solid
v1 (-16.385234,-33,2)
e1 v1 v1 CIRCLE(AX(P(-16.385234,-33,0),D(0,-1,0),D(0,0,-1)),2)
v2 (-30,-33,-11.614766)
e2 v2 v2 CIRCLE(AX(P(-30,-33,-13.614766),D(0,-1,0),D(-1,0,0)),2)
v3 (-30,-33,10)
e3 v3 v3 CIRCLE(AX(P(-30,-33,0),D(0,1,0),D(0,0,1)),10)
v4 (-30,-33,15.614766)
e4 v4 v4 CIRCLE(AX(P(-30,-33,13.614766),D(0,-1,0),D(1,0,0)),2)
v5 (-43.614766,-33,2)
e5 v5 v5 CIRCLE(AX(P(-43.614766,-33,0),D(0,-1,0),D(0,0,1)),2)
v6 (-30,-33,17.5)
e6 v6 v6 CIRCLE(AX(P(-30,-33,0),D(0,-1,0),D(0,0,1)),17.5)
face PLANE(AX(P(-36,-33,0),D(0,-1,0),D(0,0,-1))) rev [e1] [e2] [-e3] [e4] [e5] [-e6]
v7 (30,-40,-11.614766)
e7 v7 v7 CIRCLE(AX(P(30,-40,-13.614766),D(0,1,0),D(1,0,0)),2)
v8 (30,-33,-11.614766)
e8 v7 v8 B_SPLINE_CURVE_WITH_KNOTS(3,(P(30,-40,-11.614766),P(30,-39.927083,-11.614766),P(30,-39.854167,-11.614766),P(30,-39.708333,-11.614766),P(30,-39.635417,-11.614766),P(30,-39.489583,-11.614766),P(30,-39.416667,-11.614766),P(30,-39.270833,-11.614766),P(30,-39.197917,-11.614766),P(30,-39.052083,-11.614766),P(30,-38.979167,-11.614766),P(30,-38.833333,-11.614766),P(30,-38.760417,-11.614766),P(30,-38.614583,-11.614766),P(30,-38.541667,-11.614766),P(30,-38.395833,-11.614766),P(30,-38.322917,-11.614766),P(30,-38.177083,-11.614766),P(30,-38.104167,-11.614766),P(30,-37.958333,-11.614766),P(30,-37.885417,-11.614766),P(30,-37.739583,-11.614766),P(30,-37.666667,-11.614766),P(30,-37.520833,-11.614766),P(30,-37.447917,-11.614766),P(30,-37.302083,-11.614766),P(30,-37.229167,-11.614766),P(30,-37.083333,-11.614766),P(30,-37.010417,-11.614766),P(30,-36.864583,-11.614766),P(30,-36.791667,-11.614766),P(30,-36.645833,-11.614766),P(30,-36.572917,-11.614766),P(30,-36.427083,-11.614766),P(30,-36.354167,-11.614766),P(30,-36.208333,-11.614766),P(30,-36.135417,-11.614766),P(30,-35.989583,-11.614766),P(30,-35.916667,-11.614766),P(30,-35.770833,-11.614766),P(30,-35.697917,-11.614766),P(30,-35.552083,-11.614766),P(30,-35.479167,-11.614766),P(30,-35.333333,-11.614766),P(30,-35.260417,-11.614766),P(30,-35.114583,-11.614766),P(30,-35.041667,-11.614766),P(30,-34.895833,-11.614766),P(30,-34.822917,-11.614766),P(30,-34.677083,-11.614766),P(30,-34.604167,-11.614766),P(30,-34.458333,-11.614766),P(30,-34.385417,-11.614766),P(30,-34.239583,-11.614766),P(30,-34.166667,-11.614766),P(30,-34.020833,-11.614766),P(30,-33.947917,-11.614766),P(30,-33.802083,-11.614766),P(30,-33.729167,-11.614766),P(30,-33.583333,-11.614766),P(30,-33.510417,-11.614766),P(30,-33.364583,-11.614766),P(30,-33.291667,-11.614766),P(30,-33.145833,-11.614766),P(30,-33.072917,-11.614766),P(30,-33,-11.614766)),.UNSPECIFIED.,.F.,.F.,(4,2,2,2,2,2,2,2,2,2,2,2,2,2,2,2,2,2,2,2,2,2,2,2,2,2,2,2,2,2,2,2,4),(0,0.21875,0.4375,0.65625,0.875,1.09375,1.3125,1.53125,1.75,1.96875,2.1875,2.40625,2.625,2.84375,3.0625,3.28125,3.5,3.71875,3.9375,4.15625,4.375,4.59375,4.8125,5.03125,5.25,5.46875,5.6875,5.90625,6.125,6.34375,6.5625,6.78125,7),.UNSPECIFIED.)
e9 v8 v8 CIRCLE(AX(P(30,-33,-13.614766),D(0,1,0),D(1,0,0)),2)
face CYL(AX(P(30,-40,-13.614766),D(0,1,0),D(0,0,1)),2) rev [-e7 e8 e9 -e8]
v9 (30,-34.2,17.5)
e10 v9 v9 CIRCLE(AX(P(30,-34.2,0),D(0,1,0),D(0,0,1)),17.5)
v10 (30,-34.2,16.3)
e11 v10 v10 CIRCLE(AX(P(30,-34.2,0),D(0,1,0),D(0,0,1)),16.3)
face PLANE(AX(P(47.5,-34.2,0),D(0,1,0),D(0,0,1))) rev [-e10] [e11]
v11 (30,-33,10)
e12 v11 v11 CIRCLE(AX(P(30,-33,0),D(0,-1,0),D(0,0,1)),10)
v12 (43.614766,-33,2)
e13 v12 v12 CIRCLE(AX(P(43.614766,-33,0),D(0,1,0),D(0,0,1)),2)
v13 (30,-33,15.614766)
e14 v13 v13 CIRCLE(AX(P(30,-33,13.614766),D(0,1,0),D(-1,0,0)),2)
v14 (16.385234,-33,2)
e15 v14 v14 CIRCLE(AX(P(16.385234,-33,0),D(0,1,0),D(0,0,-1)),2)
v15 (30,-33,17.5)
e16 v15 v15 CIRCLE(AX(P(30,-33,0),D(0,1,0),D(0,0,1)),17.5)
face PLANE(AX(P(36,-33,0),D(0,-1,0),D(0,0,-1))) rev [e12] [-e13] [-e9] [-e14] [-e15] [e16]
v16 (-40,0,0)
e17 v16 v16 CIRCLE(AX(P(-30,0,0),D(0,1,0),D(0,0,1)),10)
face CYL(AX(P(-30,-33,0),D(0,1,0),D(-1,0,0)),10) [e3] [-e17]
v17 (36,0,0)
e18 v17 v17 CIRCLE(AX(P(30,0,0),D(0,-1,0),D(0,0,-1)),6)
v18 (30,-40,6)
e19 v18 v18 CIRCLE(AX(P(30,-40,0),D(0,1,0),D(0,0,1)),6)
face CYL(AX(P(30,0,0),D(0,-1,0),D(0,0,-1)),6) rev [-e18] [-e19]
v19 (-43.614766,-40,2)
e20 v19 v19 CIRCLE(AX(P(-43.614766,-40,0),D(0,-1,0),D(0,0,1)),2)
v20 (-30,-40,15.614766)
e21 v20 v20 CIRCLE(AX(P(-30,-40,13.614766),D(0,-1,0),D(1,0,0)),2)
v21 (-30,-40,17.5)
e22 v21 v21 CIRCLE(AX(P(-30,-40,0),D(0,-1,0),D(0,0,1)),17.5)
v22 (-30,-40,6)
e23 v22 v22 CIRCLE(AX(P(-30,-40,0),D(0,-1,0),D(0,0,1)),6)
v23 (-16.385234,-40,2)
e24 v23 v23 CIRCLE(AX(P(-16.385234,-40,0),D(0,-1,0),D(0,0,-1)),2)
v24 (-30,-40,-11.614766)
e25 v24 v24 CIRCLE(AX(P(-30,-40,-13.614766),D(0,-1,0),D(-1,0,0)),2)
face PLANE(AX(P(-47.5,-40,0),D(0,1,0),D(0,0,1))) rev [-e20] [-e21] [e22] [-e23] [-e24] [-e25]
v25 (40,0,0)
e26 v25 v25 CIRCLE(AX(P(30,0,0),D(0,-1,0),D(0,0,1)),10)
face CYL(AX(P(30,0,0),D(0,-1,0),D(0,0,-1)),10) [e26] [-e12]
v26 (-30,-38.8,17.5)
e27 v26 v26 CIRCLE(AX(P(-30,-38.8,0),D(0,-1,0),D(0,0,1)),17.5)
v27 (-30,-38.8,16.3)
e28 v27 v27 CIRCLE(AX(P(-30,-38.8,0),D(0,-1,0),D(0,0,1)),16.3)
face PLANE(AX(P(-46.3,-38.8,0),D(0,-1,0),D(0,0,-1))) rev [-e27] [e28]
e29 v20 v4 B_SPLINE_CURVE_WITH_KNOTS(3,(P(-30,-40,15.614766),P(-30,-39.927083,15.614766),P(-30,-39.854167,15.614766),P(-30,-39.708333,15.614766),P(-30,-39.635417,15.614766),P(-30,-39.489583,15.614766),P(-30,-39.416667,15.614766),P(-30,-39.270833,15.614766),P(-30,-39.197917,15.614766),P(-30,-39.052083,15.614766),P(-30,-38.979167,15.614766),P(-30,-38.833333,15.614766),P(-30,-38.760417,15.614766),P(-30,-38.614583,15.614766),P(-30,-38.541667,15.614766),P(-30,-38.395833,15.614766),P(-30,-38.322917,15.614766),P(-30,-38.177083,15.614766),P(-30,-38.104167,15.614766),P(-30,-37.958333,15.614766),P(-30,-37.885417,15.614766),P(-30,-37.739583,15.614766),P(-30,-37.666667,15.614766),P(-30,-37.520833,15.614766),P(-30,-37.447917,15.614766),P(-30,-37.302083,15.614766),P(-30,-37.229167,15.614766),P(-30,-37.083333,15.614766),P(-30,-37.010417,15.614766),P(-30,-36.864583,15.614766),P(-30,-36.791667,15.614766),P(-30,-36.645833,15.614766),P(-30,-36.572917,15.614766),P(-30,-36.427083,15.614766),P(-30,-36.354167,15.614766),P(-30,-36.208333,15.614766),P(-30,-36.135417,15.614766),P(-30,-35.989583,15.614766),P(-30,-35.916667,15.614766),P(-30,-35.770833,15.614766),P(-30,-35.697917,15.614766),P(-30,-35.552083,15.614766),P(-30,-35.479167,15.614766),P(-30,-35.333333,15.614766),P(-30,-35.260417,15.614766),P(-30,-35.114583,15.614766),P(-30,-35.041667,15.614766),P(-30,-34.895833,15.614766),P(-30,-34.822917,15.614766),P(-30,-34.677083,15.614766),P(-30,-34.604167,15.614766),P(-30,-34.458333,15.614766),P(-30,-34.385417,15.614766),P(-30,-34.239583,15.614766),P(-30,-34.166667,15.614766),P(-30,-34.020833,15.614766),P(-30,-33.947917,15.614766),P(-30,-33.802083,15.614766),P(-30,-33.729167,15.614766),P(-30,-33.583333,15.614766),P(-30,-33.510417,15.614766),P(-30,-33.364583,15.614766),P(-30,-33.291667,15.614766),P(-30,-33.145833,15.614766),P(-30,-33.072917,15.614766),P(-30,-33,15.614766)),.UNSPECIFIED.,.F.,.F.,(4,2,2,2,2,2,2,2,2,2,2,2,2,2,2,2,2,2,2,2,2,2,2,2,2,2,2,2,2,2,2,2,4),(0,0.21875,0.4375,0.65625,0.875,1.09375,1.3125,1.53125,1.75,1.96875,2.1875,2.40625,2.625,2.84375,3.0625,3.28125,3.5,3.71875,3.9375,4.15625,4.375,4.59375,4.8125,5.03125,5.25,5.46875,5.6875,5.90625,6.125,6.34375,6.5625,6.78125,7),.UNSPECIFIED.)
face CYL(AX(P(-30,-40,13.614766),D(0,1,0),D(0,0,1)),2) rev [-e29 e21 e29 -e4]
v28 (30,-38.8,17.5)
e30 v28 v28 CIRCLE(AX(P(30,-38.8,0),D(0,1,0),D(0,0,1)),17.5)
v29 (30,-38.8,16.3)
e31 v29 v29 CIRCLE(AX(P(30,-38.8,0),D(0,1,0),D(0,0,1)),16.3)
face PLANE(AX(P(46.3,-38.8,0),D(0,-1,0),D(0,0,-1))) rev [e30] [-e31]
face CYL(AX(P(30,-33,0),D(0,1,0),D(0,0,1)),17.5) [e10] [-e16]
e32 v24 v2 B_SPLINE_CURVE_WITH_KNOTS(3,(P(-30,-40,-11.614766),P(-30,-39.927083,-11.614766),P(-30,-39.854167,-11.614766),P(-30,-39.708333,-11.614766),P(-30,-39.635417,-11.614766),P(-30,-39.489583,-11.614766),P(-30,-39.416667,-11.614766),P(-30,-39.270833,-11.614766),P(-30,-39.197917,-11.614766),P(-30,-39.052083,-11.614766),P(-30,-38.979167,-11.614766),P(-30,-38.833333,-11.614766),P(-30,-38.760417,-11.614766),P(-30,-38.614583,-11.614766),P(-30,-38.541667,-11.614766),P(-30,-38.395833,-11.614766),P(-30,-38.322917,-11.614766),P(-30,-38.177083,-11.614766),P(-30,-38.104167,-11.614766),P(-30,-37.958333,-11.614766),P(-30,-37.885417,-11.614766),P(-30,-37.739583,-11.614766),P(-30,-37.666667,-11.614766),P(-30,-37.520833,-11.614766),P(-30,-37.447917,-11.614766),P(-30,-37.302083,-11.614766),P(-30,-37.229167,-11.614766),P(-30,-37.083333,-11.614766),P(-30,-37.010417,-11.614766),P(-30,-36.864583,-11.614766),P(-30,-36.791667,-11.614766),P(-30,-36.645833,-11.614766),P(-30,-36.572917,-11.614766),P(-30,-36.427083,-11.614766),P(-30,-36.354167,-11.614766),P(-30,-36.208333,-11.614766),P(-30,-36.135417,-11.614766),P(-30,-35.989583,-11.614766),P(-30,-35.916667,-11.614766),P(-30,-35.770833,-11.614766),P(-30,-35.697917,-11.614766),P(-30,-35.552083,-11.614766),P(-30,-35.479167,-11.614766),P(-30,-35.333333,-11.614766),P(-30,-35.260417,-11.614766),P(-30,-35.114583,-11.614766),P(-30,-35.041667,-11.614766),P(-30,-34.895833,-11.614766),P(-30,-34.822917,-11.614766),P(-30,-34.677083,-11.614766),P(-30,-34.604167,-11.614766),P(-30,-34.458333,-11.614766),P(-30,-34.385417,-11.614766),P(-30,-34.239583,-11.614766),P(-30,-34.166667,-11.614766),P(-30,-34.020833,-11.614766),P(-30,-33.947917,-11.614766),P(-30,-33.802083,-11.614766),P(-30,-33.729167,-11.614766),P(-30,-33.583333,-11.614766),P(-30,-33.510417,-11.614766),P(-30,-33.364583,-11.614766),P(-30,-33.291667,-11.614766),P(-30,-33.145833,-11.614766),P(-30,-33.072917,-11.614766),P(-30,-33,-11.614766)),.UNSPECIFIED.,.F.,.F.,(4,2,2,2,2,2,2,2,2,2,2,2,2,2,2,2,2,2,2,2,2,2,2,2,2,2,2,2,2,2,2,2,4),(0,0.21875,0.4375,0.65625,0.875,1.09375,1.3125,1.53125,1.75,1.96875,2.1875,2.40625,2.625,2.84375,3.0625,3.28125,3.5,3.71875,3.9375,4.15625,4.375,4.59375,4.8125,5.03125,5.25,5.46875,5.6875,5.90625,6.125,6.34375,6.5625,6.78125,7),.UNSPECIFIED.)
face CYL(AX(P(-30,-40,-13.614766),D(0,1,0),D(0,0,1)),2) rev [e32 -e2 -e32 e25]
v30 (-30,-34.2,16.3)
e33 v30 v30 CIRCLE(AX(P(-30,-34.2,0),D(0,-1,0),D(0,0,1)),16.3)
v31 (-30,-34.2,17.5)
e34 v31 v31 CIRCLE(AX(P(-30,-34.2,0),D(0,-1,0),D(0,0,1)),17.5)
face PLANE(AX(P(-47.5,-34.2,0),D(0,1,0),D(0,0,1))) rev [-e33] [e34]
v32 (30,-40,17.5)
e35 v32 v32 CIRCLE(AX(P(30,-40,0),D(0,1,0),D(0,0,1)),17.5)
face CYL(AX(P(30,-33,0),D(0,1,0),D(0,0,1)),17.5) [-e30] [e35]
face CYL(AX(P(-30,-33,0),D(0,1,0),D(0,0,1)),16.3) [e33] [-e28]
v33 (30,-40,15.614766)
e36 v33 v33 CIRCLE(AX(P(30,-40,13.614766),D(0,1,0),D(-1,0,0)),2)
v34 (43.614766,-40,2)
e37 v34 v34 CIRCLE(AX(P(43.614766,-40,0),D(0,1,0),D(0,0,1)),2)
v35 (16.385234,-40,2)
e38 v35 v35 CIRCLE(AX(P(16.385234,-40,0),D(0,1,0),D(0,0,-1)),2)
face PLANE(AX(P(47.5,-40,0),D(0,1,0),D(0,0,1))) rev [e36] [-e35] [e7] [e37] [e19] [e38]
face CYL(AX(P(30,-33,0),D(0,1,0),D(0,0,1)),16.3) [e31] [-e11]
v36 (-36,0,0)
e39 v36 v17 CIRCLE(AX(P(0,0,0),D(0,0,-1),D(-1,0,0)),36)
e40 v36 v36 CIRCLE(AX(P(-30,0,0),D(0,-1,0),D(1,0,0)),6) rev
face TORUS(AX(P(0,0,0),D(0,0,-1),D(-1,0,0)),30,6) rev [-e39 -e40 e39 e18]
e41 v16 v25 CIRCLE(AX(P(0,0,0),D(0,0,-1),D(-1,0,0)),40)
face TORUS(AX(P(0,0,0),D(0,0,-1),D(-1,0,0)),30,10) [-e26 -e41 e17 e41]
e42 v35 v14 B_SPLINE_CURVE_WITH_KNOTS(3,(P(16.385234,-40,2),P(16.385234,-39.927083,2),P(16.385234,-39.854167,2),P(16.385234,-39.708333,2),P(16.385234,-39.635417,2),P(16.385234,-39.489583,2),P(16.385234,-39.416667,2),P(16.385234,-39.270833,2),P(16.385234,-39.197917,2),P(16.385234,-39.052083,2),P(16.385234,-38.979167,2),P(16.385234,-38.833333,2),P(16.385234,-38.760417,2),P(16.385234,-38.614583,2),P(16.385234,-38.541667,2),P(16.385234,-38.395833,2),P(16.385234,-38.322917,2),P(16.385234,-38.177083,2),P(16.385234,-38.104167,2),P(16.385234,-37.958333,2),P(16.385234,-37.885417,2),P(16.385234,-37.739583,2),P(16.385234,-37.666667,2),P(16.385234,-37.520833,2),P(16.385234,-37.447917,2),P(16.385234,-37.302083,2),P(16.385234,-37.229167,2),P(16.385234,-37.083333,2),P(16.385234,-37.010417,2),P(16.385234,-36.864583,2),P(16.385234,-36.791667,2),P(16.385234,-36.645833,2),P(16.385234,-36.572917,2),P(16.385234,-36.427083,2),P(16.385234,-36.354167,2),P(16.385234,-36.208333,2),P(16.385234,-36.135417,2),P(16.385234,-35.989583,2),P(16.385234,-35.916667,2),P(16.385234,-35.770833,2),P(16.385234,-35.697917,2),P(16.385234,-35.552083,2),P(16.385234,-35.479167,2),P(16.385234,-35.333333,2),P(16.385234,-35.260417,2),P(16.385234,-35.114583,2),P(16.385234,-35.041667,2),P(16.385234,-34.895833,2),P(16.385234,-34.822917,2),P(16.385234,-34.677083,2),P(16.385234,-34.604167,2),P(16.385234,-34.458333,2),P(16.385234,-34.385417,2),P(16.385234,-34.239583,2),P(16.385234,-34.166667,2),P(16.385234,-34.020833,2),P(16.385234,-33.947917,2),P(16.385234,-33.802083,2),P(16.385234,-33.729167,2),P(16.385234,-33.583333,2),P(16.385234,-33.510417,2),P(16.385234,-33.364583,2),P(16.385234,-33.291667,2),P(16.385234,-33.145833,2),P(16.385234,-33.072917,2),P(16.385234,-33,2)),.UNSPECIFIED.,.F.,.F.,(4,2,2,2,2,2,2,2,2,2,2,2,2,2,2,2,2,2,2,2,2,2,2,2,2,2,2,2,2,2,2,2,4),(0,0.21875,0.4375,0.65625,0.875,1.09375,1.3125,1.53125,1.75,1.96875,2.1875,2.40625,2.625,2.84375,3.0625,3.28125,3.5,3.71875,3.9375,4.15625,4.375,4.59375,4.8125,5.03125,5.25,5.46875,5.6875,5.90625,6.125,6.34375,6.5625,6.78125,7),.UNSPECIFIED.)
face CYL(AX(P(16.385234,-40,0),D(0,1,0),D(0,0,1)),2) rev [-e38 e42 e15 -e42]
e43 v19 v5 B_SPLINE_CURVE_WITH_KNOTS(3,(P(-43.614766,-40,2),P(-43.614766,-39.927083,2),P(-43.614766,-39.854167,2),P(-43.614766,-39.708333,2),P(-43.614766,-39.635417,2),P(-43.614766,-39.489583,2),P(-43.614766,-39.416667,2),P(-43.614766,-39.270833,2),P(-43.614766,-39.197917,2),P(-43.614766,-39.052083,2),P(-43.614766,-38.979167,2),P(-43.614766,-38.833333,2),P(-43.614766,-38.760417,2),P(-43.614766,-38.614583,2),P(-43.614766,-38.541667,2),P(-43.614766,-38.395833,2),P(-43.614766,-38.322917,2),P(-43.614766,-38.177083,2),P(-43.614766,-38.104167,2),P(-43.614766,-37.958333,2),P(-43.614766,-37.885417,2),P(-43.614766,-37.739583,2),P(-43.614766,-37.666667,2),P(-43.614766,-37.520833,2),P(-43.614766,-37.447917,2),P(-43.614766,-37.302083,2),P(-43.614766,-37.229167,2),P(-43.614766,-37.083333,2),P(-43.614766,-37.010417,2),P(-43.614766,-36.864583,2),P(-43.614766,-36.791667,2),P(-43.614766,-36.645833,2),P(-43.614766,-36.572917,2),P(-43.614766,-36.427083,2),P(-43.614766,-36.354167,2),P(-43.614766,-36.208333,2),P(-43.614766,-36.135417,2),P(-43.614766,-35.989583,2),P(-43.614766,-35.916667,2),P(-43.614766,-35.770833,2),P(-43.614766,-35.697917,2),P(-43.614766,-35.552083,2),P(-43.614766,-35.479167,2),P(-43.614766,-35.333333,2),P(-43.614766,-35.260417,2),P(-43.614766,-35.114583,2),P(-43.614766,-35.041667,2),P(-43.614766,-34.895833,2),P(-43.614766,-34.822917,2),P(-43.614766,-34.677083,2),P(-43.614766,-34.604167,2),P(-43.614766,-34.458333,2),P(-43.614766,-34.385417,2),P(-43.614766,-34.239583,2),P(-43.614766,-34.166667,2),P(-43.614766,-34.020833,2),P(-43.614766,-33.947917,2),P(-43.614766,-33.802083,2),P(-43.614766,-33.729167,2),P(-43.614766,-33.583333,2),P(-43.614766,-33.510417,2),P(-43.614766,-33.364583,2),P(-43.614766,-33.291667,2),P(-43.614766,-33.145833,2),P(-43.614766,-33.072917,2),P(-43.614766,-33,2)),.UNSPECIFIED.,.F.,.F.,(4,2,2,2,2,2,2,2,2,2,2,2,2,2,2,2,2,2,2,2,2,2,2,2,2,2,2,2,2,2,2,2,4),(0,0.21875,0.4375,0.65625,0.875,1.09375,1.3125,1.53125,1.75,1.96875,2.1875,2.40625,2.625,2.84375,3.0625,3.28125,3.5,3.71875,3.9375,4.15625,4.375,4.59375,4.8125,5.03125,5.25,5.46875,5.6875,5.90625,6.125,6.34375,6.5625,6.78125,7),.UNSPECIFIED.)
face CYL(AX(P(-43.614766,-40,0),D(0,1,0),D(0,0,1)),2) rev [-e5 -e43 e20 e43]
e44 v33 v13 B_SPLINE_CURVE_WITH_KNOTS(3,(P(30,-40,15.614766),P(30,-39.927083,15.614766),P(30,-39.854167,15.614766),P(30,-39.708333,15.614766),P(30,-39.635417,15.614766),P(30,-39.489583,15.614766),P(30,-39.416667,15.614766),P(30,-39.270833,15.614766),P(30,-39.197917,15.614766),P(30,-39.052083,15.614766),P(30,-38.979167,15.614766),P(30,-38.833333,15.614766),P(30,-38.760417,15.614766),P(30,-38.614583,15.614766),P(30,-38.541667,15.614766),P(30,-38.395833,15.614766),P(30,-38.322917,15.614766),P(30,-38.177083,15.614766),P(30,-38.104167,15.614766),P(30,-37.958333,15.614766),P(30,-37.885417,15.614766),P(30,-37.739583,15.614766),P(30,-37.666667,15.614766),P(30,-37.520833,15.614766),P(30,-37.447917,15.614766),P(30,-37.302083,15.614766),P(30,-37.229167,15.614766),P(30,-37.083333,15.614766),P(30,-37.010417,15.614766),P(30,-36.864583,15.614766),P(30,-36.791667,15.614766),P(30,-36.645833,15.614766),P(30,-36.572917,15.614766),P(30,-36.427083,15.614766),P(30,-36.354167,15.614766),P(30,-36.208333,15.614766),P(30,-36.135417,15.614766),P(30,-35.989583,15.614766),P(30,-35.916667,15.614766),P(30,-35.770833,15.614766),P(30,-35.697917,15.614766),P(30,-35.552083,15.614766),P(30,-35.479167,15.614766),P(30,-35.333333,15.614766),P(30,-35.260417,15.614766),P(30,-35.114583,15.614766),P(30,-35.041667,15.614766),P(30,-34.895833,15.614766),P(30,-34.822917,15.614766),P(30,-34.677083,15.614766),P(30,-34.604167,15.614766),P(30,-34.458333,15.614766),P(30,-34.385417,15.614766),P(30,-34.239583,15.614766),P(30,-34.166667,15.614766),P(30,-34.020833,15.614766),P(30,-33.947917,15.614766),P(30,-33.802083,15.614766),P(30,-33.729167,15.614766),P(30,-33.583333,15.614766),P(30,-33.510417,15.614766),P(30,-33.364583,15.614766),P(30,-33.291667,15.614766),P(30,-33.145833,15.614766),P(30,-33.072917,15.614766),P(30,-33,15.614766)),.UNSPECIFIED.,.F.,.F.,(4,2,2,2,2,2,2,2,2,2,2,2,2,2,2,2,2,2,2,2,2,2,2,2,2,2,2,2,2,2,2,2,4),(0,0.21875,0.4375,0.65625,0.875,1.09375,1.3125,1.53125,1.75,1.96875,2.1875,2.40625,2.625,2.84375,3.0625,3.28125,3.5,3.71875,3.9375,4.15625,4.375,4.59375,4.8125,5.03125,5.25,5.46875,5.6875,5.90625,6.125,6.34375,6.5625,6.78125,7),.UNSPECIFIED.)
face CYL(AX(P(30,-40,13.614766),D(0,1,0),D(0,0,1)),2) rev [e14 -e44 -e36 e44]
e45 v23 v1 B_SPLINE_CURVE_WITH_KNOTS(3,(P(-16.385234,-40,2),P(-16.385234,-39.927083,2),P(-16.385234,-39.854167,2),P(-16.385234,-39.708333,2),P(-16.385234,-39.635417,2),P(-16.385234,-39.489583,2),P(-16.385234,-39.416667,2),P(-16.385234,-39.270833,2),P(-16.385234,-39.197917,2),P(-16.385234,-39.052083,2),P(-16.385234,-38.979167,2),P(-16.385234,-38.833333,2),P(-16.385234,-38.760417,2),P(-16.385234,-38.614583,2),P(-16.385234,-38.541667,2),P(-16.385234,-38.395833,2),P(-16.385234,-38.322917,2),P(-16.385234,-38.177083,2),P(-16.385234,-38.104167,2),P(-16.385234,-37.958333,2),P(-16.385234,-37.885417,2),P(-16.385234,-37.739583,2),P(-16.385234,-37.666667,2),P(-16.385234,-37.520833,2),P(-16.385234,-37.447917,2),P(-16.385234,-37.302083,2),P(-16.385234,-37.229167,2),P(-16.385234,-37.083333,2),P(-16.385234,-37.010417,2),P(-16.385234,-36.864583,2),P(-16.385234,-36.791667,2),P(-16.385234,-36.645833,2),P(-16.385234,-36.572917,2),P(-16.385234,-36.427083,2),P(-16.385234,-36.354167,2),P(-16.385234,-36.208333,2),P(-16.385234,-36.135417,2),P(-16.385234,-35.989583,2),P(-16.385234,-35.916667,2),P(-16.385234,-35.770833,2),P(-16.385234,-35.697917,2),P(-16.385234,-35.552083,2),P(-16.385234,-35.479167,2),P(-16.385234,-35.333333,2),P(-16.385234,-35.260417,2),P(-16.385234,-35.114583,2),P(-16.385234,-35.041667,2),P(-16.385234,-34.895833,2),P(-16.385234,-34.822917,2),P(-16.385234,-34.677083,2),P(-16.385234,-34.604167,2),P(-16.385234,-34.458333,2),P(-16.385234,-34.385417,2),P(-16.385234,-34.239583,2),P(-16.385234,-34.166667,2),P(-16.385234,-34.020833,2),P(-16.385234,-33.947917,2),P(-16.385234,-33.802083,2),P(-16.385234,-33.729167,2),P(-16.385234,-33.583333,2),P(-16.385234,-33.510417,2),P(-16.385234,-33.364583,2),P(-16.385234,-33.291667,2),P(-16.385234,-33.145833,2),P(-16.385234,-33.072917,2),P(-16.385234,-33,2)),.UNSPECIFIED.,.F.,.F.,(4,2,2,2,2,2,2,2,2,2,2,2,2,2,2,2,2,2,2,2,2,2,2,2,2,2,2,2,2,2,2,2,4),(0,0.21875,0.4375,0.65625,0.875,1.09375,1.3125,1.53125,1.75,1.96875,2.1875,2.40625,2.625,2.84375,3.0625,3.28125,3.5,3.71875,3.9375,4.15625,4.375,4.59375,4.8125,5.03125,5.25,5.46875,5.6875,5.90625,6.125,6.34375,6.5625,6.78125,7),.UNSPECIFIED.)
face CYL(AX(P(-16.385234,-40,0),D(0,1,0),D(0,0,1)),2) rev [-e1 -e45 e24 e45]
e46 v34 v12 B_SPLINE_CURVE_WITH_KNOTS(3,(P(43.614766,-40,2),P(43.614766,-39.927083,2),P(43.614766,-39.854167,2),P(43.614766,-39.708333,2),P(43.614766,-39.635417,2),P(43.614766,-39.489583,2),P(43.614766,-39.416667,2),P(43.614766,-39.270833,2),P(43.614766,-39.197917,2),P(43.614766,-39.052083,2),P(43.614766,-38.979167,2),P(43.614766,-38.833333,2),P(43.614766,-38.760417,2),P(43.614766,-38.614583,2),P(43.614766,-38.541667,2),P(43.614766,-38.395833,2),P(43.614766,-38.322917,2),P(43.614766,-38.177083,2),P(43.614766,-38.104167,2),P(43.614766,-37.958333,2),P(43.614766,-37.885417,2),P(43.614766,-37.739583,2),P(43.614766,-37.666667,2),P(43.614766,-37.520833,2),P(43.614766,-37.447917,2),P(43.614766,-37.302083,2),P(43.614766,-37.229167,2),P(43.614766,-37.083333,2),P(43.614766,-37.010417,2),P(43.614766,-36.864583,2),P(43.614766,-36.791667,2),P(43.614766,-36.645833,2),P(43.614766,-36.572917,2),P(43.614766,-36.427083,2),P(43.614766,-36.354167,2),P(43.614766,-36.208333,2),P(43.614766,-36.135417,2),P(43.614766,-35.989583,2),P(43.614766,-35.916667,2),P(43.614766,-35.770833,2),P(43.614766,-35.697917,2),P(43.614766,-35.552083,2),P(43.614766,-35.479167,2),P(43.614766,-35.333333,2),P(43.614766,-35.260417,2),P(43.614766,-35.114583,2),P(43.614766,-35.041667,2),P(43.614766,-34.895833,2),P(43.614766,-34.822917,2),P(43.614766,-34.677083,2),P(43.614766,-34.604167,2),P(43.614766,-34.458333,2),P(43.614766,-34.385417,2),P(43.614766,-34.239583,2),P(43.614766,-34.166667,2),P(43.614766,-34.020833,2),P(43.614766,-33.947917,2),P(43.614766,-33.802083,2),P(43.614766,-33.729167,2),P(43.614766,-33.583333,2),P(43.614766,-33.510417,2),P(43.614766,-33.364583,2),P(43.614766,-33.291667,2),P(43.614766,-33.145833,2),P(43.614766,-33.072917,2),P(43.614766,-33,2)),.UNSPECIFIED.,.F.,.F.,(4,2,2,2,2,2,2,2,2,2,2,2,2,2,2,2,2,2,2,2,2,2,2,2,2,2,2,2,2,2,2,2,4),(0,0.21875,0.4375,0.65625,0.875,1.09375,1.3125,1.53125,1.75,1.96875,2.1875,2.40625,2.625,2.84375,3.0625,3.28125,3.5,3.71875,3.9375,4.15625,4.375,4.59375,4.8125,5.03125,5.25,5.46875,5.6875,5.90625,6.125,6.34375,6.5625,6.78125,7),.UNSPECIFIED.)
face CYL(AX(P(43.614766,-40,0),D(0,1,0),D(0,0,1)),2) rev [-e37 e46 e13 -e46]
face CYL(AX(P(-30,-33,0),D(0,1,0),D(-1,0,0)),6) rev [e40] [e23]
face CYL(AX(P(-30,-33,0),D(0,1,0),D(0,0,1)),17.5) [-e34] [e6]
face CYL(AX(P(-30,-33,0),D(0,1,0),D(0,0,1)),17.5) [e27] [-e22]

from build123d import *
from build123d.topology import SkipClean

# Parameters (mm, degrees)
SKETCH3_R               = 10
SKETCH3_R_2             = 6
SKETCH7_R               = 2
CUT_EXTRUDE1_DEPTH      = 89.834115151
CIRPATTERN1_COUNT       = 4
MIRROR2_COPY_1_SKETCH_R = 2
MIRROR2_COPY_1_DEPTH    = 89.834115151
MIRROR2_COPY_2_SKETCH_R = 2
MIRROR2_COPY_2_DEPTH    = 89.834115151
MIRROR2_COPY_3_SKETCH_R = 2
MIRROR2_COPY_3_DEPTH    = 89.834115151
MIRROR2_COPY_4_SKETCH_R = 2
MIRROR2_COPY_4_DEPTH    = 89.834115151


with BuildPart() as part:
    # Sweep-Thin2: sweep along a path in Sketch1
    with BuildLine(Plane.XY) as sweep_thin2_path:
        Line((-30, -33), (-30, 0))
        ThreePointArc((-30, 0), (0, 30), (30, 0))
        Line((30, 0), (30, -33))
    # Sketch3 → Sweep-Thin2 (sweep)
    with BuildSketch(Plane(origin=(0, -33, 0), x_dir=(1, 0, 0), z_dir=(0, 1, 0))):
        with Locations((-30, 0)):
            Circle(SKETCH3_R)
        with Locations((-30, 0)):
            Circle(SKETCH3_R_2, mode=Mode.SUBTRACT)
    sweep(path=sweep_thin2_path.line)

    # Sketch4 → Revolve2 (revolve)
    with SkipClean():  # the faces are left unmerged after this step: merging them gives an invalid solid
        with BuildSketch(Plane.XY):
            Polygon((36, -33), (47.5, -33), (47.5, -34.2), (46.3, -34.2), (46.3, -38.8), (47.5, -38.8), (47.5, -40), (36, -40), align=None)
        revolve2 = revolve(axis=Axis((30, -33, 0), (0, -1, 0)))
    add(part.part.scale(1), mode=Mode.REPLACE)  # the faces are merged on a copy

    # Sketch7 → Cut-Extrude1 (cut, through all)
    with BuildSketch(Plane(origin=(0, -33, 0), x_dir=(1, 0, 0), z_dir=(0, 1, 0))):
        with Locations((43.614766478, 0)):
            Circle(SKETCH7_R)
    cut_extrude1 = extrude(amount=-CUT_EXTRUDE1_DEPTH, mode=Mode.SUBTRACT)

    # CirPattern1: Cut-Extrude1 ×4 about axis
    cirpattern1_axis = Axis((30, 0, 0), (0, -1, 0))
    for i in range(1, CIRPATTERN1_COUNT):
        add(cut_extrude1.rotate(cirpattern1_axis, i * 360 / CIRPATTERN1_COUNT), mode=Mode.SUBTRACT)

    # Mirror2: Revolve2 across plane
    with SkipClean():  # the faces are left unmerged after this step: merging them gives an invalid solid
        add(revolve2.mirror(Plane(origin=(0, 0, 0), x_dir=(0, 0, 1), z_dir=(1, 0, 0))))

    # Mirror2 copy 1 sketch → Mirror2 copy 1 (cut, through all)
    with BuildSketch(Plane(origin=(-30, -33, -30), x_dir=(0, 0, 1), z_dir=(0, 1, 0))):
        with Locations((43.614766478, 0)):
            Circle(MIRROR2_COPY_1_SKETCH_R)
    extrude(amount=-MIRROR2_COPY_1_DEPTH, mode=Mode.SUBTRACT)

    # Mirror2 copy 2 sketch → Mirror2 copy 2 (cut, through all)
    with BuildSketch(Plane(origin=(-60, -33, 0), x_dir=(1, 0, 0), z_dir=(0, 1, 0))):
        with Locations((43.614766478, 0)):
            Circle(MIRROR2_COPY_2_SKETCH_R)
    extrude(amount=-MIRROR2_COPY_2_DEPTH, mode=Mode.SUBTRACT)

    # Mirror2 copy 3 sketch → Mirror2 copy 3 (cut, through all)
    with BuildSketch(Plane(origin=(-30, -33, 30), x_dir=(0, 0, -1), z_dir=(0, 1, 0))):
        with Locations((43.614766478, 0)):
            Circle(MIRROR2_COPY_3_SKETCH_R)
    extrude(amount=-MIRROR2_COPY_3_DEPTH, mode=Mode.SUBTRACT)

    # Mirror2 copy 4 sketch → Mirror2 copy 4 (cut, through all)
    with BuildSketch(Plane(origin=(0, -33, 0), x_dir=(-1, 0, 0), z_dir=(0, 1, 0))):
        with Locations((43.614766478, 0)):
            Circle(MIRROR2_COPY_4_SKETCH_R)
    extrude(amount=-MIRROR2_COPY_4_DEPTH, mode=Mode.SUBTRACT)


solid = part.part
